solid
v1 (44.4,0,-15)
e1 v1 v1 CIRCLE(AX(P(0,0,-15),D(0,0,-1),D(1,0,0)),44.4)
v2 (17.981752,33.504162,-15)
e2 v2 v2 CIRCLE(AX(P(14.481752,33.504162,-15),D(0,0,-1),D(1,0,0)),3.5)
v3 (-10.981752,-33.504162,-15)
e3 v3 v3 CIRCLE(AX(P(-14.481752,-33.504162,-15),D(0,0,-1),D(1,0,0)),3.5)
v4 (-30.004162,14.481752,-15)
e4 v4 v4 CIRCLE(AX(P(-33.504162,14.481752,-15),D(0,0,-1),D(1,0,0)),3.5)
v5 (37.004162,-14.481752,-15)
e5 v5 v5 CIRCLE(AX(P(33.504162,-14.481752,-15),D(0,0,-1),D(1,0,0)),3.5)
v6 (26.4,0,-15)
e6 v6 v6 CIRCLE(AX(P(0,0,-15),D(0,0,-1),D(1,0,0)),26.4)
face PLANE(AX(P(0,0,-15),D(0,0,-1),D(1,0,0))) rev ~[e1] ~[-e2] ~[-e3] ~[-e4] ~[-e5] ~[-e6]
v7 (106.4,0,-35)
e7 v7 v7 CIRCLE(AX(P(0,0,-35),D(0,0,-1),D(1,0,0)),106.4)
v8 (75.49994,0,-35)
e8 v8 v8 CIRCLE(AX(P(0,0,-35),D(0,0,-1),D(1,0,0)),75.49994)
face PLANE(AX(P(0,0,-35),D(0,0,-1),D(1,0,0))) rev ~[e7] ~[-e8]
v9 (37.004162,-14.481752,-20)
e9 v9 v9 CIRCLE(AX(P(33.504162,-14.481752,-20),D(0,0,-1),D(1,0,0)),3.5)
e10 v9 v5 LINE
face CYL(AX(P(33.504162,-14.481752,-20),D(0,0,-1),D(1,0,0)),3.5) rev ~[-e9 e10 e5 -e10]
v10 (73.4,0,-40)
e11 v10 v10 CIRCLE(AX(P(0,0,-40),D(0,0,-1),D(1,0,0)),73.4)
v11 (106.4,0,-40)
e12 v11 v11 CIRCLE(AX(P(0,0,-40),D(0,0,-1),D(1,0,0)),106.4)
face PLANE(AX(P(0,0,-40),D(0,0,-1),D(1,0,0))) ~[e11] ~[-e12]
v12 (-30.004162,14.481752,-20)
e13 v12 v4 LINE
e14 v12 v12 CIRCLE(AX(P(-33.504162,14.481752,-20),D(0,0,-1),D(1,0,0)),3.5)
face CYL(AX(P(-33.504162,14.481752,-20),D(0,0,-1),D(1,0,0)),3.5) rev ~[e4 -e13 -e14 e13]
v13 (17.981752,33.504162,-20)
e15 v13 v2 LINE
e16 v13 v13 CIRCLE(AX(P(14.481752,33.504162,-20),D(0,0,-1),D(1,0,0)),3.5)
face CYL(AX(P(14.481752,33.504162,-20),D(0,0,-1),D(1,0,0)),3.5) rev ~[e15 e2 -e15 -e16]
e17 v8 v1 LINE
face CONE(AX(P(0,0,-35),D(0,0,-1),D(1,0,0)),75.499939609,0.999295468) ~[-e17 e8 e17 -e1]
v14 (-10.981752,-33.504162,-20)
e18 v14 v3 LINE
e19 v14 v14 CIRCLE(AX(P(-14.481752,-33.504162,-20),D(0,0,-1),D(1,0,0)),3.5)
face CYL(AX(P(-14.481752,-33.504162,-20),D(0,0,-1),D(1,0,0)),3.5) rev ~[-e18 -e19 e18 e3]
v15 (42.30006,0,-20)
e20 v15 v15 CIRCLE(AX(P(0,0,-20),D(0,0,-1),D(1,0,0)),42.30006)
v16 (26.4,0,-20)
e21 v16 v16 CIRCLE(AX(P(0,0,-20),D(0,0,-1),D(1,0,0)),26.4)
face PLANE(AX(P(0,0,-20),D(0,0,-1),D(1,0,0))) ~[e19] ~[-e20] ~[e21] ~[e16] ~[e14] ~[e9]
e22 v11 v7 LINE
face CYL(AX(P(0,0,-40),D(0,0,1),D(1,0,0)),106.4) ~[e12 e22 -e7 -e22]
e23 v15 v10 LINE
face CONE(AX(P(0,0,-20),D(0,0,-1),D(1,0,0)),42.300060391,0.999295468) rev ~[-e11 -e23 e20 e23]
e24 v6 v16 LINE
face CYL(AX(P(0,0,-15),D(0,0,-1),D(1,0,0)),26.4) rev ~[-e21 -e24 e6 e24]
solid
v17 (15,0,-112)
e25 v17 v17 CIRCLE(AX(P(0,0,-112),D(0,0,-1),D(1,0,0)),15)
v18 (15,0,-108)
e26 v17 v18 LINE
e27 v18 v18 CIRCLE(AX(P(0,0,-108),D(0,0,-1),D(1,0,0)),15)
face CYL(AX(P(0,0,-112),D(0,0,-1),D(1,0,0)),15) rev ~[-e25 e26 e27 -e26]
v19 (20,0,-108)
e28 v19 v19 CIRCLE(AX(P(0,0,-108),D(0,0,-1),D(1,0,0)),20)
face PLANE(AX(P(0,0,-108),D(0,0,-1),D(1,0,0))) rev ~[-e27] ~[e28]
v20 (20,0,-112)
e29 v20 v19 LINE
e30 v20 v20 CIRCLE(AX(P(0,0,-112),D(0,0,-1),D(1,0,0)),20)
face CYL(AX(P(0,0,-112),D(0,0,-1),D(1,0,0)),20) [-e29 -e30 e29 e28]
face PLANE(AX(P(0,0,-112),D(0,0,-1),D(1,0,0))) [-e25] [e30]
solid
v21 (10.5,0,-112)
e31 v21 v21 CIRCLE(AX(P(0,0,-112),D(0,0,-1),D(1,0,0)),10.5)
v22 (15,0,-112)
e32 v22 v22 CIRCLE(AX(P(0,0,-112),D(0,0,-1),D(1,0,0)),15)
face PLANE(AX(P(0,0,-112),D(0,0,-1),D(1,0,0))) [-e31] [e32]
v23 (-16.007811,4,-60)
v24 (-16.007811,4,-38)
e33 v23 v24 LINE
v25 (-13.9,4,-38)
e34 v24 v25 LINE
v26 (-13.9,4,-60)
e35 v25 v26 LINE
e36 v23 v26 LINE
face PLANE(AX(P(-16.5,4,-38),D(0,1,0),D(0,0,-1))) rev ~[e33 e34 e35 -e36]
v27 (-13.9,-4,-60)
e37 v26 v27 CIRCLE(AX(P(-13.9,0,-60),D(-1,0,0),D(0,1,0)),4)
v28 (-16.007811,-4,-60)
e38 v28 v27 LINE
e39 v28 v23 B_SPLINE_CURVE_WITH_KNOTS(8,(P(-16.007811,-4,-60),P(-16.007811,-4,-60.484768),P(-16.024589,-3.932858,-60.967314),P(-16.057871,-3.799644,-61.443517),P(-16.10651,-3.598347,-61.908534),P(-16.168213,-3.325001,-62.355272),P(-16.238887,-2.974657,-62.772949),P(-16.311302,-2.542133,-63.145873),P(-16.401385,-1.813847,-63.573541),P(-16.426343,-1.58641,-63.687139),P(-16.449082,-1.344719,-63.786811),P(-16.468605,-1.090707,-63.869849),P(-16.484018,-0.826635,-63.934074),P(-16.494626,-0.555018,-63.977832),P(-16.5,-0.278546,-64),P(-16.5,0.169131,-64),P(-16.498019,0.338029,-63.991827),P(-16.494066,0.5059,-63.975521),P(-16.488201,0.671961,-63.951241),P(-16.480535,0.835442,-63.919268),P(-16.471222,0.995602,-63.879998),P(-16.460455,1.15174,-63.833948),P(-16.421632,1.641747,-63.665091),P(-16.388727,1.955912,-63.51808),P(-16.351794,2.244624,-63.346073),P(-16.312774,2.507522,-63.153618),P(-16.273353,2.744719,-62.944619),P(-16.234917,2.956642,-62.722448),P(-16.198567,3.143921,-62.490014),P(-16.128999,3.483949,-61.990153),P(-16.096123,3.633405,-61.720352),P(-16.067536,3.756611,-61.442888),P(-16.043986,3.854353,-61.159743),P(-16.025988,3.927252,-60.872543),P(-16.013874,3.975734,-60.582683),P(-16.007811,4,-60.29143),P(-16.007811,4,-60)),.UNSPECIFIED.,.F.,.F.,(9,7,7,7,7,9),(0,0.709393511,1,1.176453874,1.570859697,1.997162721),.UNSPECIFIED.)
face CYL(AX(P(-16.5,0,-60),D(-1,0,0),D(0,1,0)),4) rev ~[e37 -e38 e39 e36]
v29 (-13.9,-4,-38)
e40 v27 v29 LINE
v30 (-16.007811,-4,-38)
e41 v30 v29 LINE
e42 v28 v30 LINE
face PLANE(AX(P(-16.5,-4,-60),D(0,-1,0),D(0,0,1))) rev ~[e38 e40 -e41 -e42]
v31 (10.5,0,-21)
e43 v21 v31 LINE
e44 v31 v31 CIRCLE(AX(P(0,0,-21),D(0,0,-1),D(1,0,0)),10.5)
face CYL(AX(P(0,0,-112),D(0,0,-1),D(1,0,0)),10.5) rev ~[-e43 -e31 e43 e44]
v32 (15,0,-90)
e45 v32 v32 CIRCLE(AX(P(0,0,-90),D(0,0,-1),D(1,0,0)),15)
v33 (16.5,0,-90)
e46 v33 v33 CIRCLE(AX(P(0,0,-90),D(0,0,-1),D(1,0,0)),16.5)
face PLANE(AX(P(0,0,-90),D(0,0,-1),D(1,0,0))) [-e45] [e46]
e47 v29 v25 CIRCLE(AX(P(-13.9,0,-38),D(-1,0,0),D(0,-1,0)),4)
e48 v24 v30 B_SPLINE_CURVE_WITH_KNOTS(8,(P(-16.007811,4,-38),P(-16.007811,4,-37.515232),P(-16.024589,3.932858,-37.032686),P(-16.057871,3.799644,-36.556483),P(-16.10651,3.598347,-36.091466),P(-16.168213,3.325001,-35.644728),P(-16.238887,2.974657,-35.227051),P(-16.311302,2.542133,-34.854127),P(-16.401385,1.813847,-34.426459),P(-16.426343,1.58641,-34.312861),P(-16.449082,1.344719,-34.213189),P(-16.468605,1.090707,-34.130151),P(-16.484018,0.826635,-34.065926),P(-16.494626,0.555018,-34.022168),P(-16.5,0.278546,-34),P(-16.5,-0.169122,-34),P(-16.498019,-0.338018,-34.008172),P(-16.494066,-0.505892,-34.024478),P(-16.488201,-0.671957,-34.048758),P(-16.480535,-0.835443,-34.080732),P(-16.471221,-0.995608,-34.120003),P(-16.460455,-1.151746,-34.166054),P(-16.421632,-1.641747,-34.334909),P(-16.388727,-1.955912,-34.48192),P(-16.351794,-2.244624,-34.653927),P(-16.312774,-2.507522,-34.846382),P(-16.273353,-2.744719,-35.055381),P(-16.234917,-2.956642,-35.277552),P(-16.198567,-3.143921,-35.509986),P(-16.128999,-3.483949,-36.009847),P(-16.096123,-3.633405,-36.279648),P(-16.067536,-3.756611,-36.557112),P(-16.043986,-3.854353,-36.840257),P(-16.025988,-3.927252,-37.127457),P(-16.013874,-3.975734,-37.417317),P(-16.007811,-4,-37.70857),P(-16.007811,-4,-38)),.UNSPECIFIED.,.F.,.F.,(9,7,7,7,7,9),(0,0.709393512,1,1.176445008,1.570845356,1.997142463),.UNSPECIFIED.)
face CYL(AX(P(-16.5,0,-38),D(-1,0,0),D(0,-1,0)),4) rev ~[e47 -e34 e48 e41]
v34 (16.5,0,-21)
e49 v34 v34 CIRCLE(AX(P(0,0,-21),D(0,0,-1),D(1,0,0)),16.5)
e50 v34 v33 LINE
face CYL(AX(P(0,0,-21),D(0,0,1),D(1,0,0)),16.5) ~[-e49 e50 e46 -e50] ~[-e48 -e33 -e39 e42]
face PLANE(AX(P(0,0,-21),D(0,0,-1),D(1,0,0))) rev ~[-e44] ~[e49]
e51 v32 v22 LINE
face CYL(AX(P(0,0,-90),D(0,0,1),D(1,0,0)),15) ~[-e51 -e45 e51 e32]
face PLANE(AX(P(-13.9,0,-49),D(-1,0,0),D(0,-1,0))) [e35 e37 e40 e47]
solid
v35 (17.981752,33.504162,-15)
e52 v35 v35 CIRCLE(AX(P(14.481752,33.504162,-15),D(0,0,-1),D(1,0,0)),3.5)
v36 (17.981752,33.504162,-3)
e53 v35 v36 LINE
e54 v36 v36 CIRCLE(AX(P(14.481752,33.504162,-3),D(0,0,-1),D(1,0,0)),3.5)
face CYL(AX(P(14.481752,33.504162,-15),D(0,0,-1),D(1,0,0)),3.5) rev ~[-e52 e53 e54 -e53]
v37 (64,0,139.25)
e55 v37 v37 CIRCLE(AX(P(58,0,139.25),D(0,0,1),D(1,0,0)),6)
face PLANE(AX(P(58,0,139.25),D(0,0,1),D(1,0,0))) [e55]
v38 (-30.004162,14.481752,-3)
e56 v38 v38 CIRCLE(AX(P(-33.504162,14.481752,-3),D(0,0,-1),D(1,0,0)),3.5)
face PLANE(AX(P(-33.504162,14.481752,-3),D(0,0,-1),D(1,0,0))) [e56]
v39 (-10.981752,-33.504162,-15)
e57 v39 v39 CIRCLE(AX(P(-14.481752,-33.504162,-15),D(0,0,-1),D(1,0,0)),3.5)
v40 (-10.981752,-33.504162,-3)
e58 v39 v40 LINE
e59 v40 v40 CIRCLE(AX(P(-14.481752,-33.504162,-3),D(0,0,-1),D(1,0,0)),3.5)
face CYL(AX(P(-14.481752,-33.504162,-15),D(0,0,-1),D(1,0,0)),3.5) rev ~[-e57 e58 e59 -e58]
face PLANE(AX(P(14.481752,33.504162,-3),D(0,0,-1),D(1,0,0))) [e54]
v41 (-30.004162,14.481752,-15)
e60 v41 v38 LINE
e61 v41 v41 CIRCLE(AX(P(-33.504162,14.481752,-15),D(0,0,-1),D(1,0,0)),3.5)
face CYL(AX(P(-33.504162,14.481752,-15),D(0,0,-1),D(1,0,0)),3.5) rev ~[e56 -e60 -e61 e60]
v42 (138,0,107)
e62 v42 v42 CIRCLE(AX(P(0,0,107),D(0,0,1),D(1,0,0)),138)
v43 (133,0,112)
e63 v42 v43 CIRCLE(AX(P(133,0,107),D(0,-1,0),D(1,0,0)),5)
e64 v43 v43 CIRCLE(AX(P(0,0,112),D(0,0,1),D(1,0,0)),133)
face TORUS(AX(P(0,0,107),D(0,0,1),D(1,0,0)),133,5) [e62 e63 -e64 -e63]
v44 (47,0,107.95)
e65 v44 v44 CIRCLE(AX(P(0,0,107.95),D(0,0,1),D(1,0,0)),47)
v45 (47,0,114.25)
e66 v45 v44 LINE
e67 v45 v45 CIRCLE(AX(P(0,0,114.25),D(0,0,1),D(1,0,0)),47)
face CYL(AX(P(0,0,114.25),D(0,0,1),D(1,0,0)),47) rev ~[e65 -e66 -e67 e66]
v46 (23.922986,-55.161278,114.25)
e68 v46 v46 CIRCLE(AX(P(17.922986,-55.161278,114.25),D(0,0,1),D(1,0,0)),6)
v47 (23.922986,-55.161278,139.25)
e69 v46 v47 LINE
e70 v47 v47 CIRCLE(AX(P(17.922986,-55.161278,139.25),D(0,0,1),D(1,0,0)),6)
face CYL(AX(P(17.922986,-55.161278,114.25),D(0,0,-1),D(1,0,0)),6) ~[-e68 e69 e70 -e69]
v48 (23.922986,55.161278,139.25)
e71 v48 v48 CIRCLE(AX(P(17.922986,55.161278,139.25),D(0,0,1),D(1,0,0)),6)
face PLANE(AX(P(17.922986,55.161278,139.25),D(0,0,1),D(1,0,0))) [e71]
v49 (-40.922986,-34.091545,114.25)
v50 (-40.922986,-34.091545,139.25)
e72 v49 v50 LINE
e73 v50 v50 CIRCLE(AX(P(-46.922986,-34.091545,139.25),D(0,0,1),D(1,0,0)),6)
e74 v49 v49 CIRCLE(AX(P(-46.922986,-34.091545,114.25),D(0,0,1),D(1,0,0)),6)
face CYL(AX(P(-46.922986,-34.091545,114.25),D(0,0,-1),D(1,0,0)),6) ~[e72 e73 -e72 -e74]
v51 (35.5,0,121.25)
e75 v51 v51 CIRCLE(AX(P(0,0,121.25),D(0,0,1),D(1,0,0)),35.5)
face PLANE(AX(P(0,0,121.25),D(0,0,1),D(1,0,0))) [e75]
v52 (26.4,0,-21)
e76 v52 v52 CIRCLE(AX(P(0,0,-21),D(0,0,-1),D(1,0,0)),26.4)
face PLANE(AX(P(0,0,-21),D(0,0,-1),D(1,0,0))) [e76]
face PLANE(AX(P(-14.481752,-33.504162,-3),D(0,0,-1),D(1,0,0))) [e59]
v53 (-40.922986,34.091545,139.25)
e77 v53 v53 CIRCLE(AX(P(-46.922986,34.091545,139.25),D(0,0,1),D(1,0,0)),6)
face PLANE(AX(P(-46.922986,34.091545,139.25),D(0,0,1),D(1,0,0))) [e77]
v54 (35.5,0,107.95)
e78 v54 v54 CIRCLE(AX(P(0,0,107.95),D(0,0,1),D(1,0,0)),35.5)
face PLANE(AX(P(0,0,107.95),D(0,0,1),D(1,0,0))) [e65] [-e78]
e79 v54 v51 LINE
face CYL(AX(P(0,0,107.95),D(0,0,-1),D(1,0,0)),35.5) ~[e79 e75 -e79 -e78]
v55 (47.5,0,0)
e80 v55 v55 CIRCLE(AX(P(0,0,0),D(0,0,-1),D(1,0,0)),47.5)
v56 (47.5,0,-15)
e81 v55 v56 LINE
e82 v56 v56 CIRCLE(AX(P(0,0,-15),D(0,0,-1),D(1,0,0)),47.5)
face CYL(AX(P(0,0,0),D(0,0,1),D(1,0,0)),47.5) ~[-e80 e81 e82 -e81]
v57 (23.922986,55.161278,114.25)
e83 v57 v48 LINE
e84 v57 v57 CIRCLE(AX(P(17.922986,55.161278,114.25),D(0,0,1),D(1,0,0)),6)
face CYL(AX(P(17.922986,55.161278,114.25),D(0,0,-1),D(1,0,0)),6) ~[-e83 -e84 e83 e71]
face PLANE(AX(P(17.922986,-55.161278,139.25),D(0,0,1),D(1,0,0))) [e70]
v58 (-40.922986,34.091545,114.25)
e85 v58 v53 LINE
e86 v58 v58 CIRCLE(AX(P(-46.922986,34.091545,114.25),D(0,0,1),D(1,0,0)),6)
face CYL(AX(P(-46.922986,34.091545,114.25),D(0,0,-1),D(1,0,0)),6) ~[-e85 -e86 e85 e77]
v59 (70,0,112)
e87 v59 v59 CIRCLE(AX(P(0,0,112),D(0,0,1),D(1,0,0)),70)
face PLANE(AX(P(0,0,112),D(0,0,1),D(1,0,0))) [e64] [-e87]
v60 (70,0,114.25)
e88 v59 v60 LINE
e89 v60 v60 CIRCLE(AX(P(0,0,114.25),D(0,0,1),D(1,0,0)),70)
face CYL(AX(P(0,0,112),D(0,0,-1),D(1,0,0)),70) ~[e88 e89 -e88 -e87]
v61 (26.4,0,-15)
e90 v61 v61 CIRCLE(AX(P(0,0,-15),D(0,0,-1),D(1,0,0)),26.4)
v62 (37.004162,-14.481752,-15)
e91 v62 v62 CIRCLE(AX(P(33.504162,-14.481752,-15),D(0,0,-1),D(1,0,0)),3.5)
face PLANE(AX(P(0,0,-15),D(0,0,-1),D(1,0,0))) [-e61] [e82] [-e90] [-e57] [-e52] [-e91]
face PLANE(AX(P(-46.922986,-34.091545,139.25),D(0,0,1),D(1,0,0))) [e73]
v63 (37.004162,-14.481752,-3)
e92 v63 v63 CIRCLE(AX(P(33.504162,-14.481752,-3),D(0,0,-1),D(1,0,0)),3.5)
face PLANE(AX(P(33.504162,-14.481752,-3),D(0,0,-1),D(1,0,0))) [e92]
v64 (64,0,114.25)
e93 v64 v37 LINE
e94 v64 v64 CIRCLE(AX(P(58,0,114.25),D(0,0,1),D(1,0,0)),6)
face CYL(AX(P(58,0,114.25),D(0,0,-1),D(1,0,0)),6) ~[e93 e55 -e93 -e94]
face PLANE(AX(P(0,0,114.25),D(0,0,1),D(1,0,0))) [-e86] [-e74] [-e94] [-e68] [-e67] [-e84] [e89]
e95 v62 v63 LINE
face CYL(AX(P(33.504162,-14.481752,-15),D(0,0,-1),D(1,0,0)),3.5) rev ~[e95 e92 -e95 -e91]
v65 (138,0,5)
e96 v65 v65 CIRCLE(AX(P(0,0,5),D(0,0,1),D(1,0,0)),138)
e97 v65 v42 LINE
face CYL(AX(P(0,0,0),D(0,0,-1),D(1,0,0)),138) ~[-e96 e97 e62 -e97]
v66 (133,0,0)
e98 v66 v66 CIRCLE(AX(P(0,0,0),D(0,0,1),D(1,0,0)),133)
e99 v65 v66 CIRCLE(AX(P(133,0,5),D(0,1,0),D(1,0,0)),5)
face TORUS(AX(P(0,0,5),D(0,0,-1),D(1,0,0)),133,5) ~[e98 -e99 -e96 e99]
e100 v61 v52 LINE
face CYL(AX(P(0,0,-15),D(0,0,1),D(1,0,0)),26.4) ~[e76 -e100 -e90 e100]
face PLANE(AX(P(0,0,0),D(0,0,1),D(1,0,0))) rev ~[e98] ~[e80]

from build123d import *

# Parameters (mm, degrees)
F0_R      = 138
F1_DEPTH  = 112
F2_R      = 70
F3_DEPTH  = 2.25
F4_R      = 5
F5_R      = 47
F6_DEPTH  = 6.3
F8_R      = 6
F9_DEPTH  = 25
F7_R      = 35.5
F10_DEPTH = 13.3
F11_R     = 47.5
F12_DEPTH = 15
F13_R     = 26.4
F14_DEPTH = 6
F15_R     = 3.5
F16_DEPTH = 12
F17_R     = 16.5
F18_DEPTH = 69
F19_R     = 15
F20_DEPTH = 22
F21_R     = 10.5
F22_DEPTH = 251.251
F26_DEPTH = 2.6
F27_R     = 20
F27_R_2   = 15
F28_DEPTH = 4
F31_R     = 3.5
F32_DEPTH = 25


with BuildPart() as f1:
    # F0 (on Top) → F1 (new body)
    with BuildSketch(Plane.XY):
        Circle(F0_R)
    extrude(amount=F1_DEPTH)

    # F2 (on face) → F3 (join)
    with BuildSketch(Plane.XY.offset(112)):
        Circle(F2_R)
    extrude(amount=F3_DEPTH)

    # F4
    f4_edges = [f1.edges().sort_by_distance(p)[0] for p in [
        (138, 0, 56),
        (-138, 0, 0),
        (-138, 0, 112),
    ]]
    fillet(f4_edges, radius=F4_R)

    # F5 (on face) → F6 (cut)
    with BuildSketch(Plane.XY.offset(114.25)):
        Circle(F5_R)
    extrude(amount=-F6_DEPTH, mode=Mode.SUBTRACT)

    # F8 (on face) → F9 (join)
    with BuildSketch(Plane.XY.offset(114.25)):
        with Locations((58, 0)):
            Circle(F8_R)
        with Locations((17.9229856737, 55.1612779451)):
            Circle(F8_R)
        with Locations((-46.9229856737, 34.091544633)):
            Circle(F8_R)
        with Locations((-46.9229856737, -34.091544633)):
            Circle(F8_R)
        with Locations((17.9229856737, -55.1612779451)):
            Circle(F8_R)
    extrude(amount=F9_DEPTH)

    # F7 (on face) → F10 (join)
    with BuildSketch(Plane.XY.offset(107.95)):
        Circle(F7_R)
    extrude(amount=F10_DEPTH)

    # F11 (on face) → F12 (join)
    with BuildSketch(Plane(origin=(0, 0, 0), x_dir=(1, 0, 0), z_dir=(0, 0, -1))):
        Circle(F11_R)
    extrude(amount=F12_DEPTH)

    # F13 (on face) → F14 (join)
    with BuildSketch(Plane(origin=(0, 0, -15), x_dir=(1, 0, 0), z_dir=(0, 0, -1))):
        Circle(F13_R)
    extrude(amount=F14_DEPTH)

    # F15 (on face) → F16 (cut)
    with BuildSketch(Plane(origin=(0, 0, -15), x_dir=(1, 0, 0), z_dir=(0, 0, -1))):
        with Locations((33.5041616609, 14.4817523593)):
            Circle(F15_R)
        with Locations((-14.4817523593, 33.5041616609)):
            Circle(F15_R)
        with Locations((-33.5041616609, -14.4817523593)):
            Circle(F15_R)
        with Locations((14.4817523593, -33.5041616609)):
            Circle(F15_R)
    extrude(amount=-F16_DEPTH, mode=Mode.SUBTRACT)


with BuildPart() as f18:
    # F17 (on face) → F18 (new body)
    with BuildSketch(Plane(origin=(0, 0, -21), x_dir=(1, 0, 0), z_dir=(0, 0, -1))):
        Circle(F17_R)
    extrude(amount=F18_DEPTH)

    # F19 (on face) → F20 (join)
    with BuildSketch(Plane(origin=(0, 0, -90), x_dir=(1, 0, 0), z_dir=(0, 0, -1))):
        Circle(F19_R)
    extrude(amount=F20_DEPTH)

    # F21 (on face) → F22 (cut, through all)
    with BuildSketch(Plane(origin=(0, 0, -112), x_dir=(1, 0, 0), z_dir=(0, 0, -1))):
        Circle(F21_R)
    extrude(amount=-F22_DEPTH, mode=Mode.SUBTRACT)

    # F25 (on line) → F26 (cut)
    with BuildSketch(Plane(origin=(-16.5, 0, 0), x_dir=(0, -1, 0), z_dir=(-1, 0, 0))):
        with BuildLine():
            ThreePointArc((-4, -60), (0, -64), (4, -60))
            Line((4, -60), (4, -38))
            ThreePointArc((4, -38), (0, -34), (-4, -38))
            Line((-4, -38), (-4, -60))
        make_face()
    extrude(amount=-F26_DEPTH, mode=Mode.SUBTRACT)


with BuildPart() as f28:
    # F27 (on face) → F28 (new body)
    with BuildSketch(Plane(origin=(0, 0, -112), x_dir=(1, 0, 0), z_dir=(0, 0, -1))):
        Circle(F27_R)
        Circle(F27_R_2, mode=Mode.SUBTRACT)
    extrude(amount=-F28_DEPTH)


with BuildPart() as f30:
    # F29 (on Front) → F30 (revolve)
    with BuildSketch(Plane.XZ):
        Polygon((44.4, -15), (26.4, -15), (26.4, -20), (42.3000603914, -20), (73.4, -40), (106.4, -40), (106.4, -35), (75.4999396086, -35), align=None)
    revolve(axis=Axis((0, 0, -37.7042032778), (0, 0, -1)))

    # F31 (on face) → F32 (cut)
    with BuildSketch(Plane(origin=(0, 0, -20), x_dir=(1, 0, 0), z_dir=(0, 0, -1))):
        with Locations((33.5041616609, 14.4817523593)):
            Circle(F31_R)
        with Locations((-14.4817523593, 33.5041616609)):
            Circle(F31_R)
        with Locations((-33.5041616609, -14.4817523593)):
            Circle(F31_R)
        with Locations((14.4817523593, -33.5041616609)):
            Circle(F31_R)
    extrude(amount=-F32_DEPTH, mode=Mode.SUBTRACT)


solid = Compound([f1.part, f18.part, f28.part, f30.part])
